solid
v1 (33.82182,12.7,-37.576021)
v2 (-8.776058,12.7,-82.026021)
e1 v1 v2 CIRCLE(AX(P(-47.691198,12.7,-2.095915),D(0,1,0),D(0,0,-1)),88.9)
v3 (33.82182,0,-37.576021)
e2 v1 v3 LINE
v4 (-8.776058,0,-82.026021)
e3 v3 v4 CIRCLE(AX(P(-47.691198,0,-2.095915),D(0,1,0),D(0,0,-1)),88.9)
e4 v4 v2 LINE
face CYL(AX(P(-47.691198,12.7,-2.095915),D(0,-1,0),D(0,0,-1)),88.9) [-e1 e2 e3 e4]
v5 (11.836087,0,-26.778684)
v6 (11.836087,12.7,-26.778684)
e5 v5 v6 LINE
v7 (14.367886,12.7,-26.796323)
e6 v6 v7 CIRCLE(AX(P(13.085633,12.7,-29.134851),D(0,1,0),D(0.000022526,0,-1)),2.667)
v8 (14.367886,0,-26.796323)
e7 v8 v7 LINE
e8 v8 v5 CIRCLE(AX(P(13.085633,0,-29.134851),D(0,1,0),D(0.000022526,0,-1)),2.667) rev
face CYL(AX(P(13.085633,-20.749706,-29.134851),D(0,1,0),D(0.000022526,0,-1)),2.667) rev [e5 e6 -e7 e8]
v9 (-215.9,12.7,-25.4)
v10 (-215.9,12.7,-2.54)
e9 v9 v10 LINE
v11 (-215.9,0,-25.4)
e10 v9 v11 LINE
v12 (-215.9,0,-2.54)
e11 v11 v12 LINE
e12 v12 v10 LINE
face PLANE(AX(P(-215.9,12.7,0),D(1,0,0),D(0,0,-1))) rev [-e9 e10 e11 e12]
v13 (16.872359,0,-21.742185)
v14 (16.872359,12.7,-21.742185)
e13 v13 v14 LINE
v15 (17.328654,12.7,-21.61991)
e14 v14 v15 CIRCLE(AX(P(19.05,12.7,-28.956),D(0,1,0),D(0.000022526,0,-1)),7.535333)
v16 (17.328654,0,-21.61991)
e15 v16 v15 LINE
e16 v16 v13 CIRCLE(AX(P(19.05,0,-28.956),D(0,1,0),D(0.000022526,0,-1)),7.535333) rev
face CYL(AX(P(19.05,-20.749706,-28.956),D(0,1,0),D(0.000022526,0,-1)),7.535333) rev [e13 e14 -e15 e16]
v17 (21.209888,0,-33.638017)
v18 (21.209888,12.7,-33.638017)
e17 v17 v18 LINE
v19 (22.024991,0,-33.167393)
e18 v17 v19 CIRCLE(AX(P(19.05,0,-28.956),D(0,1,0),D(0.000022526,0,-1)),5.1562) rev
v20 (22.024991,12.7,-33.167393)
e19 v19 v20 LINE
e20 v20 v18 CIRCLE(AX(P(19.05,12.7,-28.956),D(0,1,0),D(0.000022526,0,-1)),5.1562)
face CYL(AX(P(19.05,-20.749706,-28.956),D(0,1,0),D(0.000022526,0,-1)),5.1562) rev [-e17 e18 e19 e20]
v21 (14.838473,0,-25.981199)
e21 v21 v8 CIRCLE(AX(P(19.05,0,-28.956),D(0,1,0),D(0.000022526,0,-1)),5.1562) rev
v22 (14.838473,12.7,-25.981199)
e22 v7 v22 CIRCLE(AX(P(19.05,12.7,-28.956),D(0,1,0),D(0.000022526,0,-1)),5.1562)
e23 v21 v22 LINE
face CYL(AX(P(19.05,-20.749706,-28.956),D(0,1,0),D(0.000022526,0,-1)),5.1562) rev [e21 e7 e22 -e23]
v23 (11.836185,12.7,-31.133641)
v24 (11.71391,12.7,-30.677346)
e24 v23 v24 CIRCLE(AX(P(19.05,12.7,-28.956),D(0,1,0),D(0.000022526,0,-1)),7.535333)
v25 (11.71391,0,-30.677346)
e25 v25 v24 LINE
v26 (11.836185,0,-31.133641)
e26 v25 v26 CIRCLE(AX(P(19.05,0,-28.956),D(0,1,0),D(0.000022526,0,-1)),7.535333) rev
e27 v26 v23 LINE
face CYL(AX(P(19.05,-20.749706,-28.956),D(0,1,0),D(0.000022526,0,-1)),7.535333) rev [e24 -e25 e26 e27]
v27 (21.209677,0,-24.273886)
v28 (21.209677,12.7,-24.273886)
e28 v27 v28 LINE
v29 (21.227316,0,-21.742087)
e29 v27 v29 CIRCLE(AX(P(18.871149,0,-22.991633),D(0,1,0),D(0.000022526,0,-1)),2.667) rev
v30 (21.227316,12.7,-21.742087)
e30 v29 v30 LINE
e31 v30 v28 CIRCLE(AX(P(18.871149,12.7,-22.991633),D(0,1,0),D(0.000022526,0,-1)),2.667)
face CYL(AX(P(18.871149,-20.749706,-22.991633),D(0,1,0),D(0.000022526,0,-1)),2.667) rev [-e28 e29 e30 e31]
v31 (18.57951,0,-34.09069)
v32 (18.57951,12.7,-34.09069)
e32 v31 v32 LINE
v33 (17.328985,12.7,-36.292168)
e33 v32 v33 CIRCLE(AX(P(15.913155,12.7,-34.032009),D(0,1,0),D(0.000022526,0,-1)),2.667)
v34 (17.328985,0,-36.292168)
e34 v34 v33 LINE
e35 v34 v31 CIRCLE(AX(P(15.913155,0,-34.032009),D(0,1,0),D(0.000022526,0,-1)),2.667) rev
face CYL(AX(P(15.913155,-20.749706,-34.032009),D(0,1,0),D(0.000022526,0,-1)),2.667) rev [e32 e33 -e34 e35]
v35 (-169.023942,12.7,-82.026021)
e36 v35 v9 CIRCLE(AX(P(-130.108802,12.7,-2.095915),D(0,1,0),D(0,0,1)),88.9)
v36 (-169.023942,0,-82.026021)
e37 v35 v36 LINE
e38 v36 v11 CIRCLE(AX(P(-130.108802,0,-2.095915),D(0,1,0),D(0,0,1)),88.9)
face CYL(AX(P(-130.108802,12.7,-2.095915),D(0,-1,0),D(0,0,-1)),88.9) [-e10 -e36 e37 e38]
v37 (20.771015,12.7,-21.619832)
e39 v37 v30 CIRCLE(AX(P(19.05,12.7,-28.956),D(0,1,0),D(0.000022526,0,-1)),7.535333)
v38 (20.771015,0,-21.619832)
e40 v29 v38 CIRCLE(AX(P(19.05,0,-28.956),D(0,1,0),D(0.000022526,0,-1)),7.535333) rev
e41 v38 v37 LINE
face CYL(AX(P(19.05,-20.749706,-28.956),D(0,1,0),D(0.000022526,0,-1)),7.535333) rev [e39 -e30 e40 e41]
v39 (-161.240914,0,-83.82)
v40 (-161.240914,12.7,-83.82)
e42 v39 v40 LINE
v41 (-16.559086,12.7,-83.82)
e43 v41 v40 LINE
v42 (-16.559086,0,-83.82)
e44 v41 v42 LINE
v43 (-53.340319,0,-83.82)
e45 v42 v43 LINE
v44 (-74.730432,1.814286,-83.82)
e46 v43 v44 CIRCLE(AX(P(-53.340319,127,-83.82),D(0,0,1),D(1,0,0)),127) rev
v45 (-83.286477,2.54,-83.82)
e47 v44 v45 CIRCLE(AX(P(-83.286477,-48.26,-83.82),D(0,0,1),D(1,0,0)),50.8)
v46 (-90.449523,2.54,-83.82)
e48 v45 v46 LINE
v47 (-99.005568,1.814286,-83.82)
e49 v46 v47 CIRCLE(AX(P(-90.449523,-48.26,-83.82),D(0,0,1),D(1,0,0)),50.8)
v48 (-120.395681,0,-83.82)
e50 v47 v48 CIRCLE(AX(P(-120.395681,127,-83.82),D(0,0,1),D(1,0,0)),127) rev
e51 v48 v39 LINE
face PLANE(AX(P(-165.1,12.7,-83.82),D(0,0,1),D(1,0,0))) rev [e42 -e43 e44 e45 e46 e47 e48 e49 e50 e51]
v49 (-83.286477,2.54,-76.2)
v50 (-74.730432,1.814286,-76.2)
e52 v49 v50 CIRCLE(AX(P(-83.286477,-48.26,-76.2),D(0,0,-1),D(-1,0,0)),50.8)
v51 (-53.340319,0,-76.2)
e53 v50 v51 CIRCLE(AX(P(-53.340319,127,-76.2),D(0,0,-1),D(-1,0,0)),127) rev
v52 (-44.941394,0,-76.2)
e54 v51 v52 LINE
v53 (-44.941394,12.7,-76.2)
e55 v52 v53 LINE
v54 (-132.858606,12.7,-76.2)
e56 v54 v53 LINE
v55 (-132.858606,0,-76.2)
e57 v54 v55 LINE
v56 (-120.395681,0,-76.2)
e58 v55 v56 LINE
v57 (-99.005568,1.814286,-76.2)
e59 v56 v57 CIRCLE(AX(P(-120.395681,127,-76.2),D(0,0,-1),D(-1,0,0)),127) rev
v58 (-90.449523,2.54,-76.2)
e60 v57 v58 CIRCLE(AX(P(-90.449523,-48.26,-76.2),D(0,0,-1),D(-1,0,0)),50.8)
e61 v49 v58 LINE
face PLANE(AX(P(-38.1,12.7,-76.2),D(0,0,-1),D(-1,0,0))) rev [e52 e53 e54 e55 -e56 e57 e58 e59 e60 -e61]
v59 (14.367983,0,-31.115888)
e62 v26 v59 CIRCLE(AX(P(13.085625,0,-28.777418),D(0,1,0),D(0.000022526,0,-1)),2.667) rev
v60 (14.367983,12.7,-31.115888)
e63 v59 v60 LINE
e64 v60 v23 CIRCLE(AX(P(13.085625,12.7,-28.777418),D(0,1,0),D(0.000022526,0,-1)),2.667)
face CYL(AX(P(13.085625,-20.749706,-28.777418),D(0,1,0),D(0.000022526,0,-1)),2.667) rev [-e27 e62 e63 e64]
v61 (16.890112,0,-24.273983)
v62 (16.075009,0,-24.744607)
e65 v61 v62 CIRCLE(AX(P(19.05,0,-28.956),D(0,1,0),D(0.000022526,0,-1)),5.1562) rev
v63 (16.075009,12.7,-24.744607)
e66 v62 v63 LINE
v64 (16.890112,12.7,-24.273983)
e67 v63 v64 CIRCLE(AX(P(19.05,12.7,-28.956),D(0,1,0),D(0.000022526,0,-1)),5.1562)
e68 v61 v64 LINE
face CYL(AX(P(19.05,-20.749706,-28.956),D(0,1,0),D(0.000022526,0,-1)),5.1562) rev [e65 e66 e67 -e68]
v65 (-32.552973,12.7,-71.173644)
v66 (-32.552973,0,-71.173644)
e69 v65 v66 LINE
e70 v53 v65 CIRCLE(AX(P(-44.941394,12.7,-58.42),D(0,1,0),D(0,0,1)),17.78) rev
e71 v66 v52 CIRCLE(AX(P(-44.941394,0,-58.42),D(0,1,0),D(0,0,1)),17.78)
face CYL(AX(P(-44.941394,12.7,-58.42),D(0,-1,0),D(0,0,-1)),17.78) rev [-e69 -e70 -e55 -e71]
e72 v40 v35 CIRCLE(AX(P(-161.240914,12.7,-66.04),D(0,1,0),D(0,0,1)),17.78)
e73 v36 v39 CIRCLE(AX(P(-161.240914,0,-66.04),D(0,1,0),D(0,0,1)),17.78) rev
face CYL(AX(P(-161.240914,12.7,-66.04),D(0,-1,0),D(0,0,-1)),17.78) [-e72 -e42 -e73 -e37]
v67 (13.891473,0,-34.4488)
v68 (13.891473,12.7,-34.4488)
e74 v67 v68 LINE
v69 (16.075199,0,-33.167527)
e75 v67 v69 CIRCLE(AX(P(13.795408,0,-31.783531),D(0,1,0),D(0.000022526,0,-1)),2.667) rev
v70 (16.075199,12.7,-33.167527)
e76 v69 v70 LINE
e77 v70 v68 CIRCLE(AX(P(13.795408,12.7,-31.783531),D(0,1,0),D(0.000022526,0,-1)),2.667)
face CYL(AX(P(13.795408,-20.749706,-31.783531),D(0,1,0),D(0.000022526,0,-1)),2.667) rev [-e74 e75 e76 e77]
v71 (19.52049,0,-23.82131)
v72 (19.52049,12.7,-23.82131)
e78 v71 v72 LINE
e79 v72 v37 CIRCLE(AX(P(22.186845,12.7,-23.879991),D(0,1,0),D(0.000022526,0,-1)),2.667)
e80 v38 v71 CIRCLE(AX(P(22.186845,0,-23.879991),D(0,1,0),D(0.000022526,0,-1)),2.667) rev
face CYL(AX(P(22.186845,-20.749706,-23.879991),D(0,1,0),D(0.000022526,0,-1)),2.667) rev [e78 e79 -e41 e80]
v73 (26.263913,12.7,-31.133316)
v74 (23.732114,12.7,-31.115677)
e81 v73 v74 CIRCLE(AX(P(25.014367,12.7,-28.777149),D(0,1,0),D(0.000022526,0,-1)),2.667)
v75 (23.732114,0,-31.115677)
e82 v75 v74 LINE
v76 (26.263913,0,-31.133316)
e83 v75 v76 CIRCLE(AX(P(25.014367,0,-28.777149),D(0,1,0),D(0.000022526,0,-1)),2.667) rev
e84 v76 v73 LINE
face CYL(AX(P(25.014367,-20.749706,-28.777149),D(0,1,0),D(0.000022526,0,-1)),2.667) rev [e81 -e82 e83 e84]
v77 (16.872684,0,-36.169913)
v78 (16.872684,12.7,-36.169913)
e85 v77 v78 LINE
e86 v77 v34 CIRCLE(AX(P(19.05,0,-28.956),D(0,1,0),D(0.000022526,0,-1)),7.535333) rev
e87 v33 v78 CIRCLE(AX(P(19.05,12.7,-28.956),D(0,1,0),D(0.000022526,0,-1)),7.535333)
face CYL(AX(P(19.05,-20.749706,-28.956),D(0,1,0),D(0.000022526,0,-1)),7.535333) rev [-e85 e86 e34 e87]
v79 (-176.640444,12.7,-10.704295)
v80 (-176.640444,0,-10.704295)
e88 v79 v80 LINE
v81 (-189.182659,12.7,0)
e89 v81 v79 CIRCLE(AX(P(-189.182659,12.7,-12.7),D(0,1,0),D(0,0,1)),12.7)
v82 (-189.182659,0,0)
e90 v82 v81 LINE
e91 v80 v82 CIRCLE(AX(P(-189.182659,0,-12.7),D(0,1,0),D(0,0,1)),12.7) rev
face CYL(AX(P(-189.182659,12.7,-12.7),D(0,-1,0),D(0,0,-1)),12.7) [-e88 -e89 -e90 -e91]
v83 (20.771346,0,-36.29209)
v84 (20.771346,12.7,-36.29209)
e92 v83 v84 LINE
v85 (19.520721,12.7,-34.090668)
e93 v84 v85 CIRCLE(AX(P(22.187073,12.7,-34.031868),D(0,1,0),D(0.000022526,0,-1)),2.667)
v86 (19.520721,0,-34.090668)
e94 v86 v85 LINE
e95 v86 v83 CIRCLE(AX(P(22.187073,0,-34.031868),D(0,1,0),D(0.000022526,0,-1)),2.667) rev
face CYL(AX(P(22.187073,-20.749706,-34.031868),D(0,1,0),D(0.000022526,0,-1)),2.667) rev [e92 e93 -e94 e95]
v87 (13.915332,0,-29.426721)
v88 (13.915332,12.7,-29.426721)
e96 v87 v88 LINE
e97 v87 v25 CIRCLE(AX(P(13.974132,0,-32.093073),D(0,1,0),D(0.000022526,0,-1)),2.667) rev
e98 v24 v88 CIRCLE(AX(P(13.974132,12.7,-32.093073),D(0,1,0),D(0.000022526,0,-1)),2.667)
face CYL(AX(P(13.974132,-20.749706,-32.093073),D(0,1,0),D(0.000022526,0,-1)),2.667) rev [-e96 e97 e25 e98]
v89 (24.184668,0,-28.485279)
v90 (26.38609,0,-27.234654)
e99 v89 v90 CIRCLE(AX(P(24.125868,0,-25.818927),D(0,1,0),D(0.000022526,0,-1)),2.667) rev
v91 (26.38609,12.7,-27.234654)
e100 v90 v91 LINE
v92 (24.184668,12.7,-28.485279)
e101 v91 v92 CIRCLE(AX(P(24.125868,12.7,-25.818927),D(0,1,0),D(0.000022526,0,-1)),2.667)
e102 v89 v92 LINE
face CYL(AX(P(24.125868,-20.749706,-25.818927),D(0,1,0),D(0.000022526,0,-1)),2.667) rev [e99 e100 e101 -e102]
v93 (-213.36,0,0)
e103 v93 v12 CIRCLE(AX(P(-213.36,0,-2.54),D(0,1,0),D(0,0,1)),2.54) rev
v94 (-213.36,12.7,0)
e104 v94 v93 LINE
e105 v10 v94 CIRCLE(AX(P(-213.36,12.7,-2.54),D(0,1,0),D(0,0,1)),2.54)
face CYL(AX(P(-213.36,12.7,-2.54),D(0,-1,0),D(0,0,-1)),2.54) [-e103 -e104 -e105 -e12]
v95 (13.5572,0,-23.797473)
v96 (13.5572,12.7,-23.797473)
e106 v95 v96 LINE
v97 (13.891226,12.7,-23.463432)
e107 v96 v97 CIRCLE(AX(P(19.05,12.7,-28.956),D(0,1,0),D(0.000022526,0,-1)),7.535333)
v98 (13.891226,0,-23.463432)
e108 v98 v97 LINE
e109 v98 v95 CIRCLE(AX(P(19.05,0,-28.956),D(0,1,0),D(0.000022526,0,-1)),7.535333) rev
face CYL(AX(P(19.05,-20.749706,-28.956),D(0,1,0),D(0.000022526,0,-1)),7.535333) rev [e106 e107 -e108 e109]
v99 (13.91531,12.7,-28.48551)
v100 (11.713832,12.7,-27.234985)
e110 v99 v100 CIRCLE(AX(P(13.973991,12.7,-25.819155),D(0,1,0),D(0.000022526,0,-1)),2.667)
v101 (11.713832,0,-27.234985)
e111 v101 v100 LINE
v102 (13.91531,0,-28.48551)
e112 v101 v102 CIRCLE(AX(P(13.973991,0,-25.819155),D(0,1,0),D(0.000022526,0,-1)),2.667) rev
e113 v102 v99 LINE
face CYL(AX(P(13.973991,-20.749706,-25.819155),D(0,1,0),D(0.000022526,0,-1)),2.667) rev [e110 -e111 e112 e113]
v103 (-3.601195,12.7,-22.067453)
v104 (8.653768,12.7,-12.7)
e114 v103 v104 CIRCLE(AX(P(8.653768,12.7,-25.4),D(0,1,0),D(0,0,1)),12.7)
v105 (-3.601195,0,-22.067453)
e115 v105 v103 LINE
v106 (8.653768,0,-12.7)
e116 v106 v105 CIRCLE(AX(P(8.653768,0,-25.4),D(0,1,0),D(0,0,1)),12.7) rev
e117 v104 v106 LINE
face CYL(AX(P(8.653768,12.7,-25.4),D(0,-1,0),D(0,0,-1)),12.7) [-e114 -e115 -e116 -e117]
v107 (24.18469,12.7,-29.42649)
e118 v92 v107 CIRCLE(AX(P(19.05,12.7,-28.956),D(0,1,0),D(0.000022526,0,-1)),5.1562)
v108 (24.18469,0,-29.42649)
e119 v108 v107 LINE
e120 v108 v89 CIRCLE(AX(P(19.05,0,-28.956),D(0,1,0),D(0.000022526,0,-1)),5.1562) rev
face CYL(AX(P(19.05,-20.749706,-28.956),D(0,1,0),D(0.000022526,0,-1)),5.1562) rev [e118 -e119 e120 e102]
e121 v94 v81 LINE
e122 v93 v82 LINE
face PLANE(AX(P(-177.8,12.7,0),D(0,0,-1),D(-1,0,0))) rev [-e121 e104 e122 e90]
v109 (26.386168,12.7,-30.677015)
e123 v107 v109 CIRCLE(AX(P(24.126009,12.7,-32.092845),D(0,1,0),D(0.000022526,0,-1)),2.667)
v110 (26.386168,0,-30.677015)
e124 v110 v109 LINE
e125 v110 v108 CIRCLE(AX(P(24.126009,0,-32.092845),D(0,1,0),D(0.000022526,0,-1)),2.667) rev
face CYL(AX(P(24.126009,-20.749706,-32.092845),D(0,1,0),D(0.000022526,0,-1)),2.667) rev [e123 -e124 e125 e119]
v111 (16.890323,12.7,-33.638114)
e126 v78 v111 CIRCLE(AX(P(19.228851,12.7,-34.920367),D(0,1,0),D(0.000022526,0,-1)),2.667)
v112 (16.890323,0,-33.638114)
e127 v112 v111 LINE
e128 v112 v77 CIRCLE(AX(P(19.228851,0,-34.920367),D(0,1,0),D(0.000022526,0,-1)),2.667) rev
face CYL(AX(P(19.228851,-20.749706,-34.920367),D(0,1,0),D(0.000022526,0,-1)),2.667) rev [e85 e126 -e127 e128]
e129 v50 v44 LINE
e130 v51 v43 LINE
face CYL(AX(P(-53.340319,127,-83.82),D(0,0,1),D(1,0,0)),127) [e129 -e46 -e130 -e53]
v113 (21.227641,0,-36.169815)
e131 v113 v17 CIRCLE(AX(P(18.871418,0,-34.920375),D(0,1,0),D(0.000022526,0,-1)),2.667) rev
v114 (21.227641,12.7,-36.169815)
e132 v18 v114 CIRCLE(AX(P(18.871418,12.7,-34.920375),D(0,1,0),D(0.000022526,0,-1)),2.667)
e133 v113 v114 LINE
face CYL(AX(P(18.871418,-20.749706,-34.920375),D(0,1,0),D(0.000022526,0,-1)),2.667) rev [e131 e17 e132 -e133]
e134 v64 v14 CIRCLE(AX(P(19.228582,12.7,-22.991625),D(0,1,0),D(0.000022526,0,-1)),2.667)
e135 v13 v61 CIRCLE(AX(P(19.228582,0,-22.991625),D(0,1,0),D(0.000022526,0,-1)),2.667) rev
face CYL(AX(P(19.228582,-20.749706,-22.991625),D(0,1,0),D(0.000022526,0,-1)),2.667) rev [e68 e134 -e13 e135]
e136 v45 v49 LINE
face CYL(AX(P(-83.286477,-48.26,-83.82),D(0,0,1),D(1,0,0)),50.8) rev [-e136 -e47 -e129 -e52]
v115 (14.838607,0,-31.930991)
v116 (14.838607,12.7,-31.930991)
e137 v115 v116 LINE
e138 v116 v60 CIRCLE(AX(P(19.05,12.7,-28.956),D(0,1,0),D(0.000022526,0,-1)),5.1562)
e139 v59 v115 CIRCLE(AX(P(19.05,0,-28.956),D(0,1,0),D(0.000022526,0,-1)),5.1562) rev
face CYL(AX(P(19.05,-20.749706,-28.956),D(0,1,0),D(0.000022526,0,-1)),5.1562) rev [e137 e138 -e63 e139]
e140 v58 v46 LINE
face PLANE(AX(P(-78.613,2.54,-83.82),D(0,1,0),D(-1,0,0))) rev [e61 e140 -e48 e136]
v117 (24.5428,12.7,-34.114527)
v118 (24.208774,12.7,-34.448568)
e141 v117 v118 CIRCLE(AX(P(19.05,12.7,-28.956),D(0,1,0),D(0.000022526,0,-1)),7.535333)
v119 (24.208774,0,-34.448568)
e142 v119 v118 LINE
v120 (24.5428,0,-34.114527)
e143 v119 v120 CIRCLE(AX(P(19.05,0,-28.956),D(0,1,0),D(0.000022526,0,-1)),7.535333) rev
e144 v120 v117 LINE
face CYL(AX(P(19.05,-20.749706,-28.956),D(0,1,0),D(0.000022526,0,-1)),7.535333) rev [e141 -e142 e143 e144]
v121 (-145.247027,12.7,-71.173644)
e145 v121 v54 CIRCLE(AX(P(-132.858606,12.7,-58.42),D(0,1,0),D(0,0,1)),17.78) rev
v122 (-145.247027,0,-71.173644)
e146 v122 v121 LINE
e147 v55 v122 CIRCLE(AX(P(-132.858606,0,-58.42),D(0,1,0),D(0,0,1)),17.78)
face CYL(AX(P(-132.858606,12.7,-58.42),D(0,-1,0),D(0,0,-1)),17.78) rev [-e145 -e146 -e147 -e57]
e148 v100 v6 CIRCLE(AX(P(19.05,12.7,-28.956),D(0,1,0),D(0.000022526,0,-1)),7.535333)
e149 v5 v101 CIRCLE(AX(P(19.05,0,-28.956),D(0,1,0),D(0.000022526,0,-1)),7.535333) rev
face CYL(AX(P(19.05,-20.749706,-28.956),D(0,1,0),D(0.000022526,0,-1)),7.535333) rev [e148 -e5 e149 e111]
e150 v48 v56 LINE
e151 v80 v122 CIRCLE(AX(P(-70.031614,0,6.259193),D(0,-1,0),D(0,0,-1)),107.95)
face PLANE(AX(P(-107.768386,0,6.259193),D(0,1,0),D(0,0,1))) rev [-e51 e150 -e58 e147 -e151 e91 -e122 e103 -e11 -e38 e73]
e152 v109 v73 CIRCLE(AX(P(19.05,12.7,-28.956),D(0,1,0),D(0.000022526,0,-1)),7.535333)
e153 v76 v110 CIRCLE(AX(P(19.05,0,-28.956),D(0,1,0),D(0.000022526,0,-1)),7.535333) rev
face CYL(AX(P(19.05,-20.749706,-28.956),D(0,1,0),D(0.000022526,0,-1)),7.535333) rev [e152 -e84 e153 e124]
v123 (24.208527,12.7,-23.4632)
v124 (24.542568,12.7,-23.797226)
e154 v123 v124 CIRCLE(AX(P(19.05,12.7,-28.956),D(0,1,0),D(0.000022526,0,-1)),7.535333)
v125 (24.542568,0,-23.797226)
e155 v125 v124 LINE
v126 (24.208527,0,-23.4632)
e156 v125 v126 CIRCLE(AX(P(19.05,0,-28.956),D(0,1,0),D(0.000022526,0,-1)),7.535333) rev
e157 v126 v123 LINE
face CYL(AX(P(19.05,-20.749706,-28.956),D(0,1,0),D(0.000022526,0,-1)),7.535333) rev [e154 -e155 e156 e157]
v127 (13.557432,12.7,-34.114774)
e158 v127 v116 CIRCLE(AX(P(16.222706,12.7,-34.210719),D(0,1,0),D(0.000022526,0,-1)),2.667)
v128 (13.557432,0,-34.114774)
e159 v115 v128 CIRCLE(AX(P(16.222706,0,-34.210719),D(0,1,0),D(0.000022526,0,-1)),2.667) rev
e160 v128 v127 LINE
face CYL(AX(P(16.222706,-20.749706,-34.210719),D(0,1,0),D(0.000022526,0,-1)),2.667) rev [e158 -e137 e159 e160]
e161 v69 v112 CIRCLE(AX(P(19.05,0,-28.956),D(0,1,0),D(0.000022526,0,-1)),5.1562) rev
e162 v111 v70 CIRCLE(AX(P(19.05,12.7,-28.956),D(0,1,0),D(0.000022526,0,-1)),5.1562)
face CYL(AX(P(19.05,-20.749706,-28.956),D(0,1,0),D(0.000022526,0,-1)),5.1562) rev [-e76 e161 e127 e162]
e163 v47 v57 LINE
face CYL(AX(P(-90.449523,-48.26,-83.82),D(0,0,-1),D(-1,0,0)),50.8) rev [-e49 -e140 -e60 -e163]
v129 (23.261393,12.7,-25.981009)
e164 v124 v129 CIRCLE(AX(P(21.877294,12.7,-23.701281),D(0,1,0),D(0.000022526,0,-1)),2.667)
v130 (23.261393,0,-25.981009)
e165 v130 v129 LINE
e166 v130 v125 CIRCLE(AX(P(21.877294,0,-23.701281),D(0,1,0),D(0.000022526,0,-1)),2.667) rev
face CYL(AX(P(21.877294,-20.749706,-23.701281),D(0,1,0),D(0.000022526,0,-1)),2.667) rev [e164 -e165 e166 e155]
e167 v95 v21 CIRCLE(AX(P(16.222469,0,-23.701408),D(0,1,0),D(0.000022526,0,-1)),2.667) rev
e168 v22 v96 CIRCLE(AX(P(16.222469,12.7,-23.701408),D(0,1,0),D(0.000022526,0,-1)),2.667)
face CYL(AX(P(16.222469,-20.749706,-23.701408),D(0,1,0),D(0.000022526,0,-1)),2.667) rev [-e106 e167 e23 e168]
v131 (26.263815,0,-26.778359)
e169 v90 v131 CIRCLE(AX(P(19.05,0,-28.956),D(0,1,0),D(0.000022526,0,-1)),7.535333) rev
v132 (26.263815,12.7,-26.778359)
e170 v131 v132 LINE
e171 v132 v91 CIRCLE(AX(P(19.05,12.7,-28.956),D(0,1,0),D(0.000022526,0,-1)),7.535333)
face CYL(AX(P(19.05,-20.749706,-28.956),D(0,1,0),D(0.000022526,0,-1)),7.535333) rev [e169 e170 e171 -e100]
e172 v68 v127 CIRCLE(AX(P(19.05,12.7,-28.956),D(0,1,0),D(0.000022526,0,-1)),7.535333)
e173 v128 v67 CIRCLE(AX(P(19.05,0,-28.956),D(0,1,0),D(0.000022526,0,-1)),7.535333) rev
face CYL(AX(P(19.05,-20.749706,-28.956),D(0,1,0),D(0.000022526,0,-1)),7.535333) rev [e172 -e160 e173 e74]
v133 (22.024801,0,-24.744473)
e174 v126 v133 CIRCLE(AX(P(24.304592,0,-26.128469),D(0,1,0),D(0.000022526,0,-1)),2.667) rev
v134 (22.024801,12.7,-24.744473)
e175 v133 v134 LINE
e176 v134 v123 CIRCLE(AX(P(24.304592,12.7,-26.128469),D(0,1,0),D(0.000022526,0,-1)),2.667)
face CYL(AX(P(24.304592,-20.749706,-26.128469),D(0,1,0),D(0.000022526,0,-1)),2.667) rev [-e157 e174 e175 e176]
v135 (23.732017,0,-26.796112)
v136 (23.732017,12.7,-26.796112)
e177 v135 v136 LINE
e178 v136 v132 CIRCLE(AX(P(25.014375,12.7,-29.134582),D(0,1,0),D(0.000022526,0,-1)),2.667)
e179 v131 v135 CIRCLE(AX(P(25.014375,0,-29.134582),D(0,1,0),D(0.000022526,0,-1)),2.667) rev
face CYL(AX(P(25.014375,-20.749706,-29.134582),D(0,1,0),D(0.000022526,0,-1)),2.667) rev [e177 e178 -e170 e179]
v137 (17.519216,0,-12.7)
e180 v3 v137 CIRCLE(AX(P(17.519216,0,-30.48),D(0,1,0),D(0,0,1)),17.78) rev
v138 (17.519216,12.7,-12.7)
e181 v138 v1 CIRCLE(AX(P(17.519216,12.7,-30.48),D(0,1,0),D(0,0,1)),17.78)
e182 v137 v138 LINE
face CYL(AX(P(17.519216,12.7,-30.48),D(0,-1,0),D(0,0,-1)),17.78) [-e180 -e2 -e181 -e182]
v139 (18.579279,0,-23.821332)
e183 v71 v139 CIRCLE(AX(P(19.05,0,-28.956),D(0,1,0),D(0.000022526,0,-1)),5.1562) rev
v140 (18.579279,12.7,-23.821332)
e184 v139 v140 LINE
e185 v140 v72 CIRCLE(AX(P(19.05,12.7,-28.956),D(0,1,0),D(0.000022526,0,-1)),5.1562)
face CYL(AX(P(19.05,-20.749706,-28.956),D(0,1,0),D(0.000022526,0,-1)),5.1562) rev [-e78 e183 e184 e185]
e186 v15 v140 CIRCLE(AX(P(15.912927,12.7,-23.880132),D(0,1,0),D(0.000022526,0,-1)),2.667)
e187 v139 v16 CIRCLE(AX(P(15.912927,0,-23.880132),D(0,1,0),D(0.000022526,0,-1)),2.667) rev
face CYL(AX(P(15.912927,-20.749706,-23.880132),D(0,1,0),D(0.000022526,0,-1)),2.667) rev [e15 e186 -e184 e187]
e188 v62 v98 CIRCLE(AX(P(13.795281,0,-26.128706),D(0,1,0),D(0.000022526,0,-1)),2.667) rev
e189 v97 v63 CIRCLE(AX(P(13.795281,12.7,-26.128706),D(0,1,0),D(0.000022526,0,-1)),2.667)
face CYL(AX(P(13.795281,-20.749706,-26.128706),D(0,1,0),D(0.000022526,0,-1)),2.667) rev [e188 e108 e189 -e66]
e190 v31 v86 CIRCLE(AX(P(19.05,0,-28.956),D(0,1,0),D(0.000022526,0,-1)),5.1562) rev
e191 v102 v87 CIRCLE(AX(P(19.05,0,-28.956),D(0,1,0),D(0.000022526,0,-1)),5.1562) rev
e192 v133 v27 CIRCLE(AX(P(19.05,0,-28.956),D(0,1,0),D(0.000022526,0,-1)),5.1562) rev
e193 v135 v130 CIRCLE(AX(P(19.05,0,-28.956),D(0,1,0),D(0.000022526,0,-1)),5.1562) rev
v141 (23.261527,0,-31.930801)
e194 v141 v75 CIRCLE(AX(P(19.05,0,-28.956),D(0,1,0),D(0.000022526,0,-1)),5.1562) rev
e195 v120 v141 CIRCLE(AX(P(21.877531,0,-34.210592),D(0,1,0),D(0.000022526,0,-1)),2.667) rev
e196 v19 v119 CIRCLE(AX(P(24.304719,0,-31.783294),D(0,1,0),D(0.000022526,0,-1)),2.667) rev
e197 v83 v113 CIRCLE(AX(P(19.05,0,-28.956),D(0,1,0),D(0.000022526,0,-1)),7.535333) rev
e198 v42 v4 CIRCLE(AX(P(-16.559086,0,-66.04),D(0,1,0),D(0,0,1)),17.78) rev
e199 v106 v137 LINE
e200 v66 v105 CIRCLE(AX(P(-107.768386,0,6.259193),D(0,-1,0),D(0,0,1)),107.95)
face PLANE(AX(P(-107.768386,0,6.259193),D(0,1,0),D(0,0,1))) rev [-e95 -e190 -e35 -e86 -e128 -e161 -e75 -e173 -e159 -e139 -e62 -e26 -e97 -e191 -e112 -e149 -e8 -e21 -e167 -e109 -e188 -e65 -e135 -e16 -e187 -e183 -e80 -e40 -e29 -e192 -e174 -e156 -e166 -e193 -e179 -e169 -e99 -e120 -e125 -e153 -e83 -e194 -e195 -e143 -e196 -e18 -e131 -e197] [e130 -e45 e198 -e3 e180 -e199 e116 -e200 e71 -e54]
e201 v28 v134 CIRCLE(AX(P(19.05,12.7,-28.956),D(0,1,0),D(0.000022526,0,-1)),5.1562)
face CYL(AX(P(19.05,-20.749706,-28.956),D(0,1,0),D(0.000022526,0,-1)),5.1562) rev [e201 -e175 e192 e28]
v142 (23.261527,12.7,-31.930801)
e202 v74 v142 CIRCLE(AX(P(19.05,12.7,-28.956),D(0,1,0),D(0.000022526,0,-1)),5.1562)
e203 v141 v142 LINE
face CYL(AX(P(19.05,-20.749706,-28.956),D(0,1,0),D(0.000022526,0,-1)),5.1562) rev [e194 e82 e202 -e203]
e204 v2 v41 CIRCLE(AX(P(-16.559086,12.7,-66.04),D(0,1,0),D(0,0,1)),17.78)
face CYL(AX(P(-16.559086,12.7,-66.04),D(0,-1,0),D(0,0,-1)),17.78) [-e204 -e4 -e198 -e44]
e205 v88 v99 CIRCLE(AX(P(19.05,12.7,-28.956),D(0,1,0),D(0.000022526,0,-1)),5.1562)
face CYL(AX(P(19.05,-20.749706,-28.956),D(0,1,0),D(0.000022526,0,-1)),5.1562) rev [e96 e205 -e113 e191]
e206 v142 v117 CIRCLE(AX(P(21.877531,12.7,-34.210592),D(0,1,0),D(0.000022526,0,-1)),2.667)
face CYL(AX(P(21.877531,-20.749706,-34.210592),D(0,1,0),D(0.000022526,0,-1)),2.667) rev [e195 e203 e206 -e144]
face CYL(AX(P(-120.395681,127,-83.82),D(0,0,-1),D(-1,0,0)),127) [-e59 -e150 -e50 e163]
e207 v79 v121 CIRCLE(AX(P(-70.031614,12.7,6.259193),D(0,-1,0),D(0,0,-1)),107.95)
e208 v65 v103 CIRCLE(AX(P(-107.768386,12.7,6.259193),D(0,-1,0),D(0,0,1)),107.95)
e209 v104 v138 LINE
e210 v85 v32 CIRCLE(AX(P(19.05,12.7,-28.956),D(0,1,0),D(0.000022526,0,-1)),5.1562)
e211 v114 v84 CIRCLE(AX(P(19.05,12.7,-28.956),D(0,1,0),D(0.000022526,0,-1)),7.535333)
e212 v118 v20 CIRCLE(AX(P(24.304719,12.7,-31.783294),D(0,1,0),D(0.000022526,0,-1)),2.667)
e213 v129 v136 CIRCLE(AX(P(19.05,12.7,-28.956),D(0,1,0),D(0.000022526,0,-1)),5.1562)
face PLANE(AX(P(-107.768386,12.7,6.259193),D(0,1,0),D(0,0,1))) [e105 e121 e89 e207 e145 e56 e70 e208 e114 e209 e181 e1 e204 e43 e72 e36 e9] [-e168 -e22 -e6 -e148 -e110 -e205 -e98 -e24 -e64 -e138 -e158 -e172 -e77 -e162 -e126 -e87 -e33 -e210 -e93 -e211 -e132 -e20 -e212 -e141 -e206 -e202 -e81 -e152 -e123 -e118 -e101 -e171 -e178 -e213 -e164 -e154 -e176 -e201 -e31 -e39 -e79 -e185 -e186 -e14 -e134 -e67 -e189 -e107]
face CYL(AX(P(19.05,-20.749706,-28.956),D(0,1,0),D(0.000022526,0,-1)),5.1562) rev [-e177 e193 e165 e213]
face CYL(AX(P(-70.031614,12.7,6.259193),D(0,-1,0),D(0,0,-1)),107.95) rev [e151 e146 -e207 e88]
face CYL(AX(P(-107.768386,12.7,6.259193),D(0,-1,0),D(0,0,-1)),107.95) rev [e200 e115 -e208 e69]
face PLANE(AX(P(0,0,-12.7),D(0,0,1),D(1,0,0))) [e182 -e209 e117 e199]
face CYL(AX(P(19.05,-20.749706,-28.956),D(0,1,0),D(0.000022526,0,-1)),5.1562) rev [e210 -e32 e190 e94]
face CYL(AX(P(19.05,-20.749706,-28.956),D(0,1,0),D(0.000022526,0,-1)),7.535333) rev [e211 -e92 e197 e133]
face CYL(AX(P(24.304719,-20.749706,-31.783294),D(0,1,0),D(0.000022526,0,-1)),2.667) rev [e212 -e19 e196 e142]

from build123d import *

# Parameters (mm, degrees)
BOSS_EXTRUDE1_DEPTH = 12.7
SKETCH3_R           = 2.286
CUT_EXTRUDE1_DEPTH  = 232.948038146
CAVITY1_START       = -1
CAVITY1_OUTLINE_R   = 2.286
CAVITY1_DEPTH       = 15
CUT_EXTRUDE2_DEPTH  = 232.948038146
FILLET1_R           = 12.7
FILLET2_R           = 2.54
FILLET3_R           = 20.32
FILLET4_R           = 17.78
SKETCH5_W           = 16.51
SKETCH5_H           = 5.08
CUT_EXTRUDE3_DEPTH  = 230.304470216
FILLET5_R           = 127
FILLET6_R           = 50.8


with BuildPart() as part:
    # Sketch1 → Boss-Extrude1 (new body)
    with BuildSketch(Plane(origin=(0, 0, 0), x_dir=(1, 0, 0), z_dir=(0, 1, 0))):
        with BuildLine():
            Line((0, 0), (38.1, 0))
            Line((38.1, 0), (38.1, 25.4))
            ThreePointArc((38.1, 25.4), (19.393233119, 60.430202712), (-12.7, 83.82))
            Line((-12.7, 83.82), (-165.1, 83.82))
            ThreePointArc((-165.1, 83.82), (-197.193233119, 60.430202712), (-215.9, 25.4))
            Line((-215.9, 25.4), (-215.9, 0))
            Line((-215.9, 0), (-177.8, 0))
            ThreePointArc((-177.8, 0), (-166.58502935, 42.017514675), (-139.7, 76.2))
            Line((-139.7, 76.2), (-38.1, 76.2))
            ThreePointArc((-38.1, 76.2), (-11.21497065, 42.017514675), (0, 0))
        make_face()
    extrude(amount=BOSS_EXTRUDE1_DEPTH)

    # Sketch3 → Cut-Extrude1 (cut, through all)
    with BuildSketch(Plane(origin=(0, 12.7, 0), x_dir=(1, 0, 0), z_dir=(0, 1, 0))):
        with Locations(Location((19.05, 28.956, 0), (0, 0, 270))):
            Circle(SKETCH3_R)
    extrude(amount=-CUT_EXTRUDE1_DEPTH, mode=Mode.SUBTRACT)

    # Cavity1: read off the stored shape, not the designer's step
    # Cavity1 outline → Cavity1 (cut)
    with BuildSketch(Plane(origin=(0, 0, 0), x_dir=(1, 0, 0), z_dir=(0, 1, 0)).offset(CAVITY1_START)):
        with BuildLine():
            ThreePointArc((13.557199982, 23.797473427), (13.721594677, 23.627834729), (13.891225968, 23.463432392))
            ThreePointArc((13.891225968, 23.463432392), (15.144839416, 23.828362371), (16.075009031, 24.744607454))
            ThreePointArc((16.075009031, 24.744607454), (16.471799412, 24.490657889), (16.890111616, 24.273983275))
            ThreePointArc((16.890111616, 24.273983275), (16.561647975, 23.010325013), (16.872358933, 21.742184932))
            ThreePointArc((16.872358933, 21.742184932), (17.099548264, 21.677470858), (17.32865444, 21.619909903))
            ThreePointArc((17.32865444, 21.619909903), (18.231850543, 22.56275526), (18.579278518, 23.821331586))
            ThreePointArc((18.579278518, 23.821331586), (19.049883851, 23.799800001), (19.520490153, 23.821310384))
            ThreePointArc((19.520490153, 23.821310384), (19.867861426, 22.562718407), (20.77101505, 21.61983236))
            ThreePointArc((20.77101505, 21.61983236), (21.000123819, 21.677382993), (21.227316065, 21.742086832))
            ThreePointArc((21.227316065, 21.742086832), (21.538084156, 23.010212914), (21.209677446, 24.273885972))
            ThreePointArc((21.209677446, 24.273885972), (21.627999411, 24.490541739), (22.024801233, 24.744473428))
            ThreePointArc((22.024801233, 24.744473428), (22.954929568, 23.828186439), (24.208526573, 23.463199982))
            ThreePointArc((24.208526573, 23.463199982), (24.378165271, 23.627594677), (24.542567608, 23.797225968))
            ThreePointArc((24.542567608, 23.797225968), (24.177637629, 25.050839416), (23.261392546, 25.981009031))
            ThreePointArc((23.261392546, 25.981009031), (23.515342111, 26.377799412), (23.732016725, 26.796111616))
            ThreePointArc((23.732016725, 26.796111616), (24.995674987, 26.467647975), (26.263815068, 26.778358933))
            ThreePointArc((26.263815068, 26.778358933), (26.328529142, 27.005548264), (26.386090097, 27.23465444))
            ThreePointArc((26.386090097, 27.23465444), (25.44324474, 28.137850543), (24.184668414, 28.485278518))
            ThreePointArc((24.184668414, 28.485278518), (24.206199999, 28.955883851), (24.184689616, 29.426490153))
            ThreePointArc((24.184689616, 29.426490153), (25.443281593, 29.773861426), (26.38616764, 30.67701505))
            ThreePointArc((26.38616764, 30.67701505), (26.328617007, 30.906123819), (26.263913168, 31.133316065))
            ThreePointArc((26.263913168, 31.133316065), (24.995787086, 31.444084156), (23.732114028, 31.115677446))
            ThreePointArc((23.732114028, 31.115677446), (23.515458261, 31.533999411), (23.261526572, 31.930801233))
            ThreePointArc((23.261526572, 31.930801233), (24.177813561, 32.860929568), (24.542800018, 34.114526573))
            ThreePointArc((24.542800018, 34.114526573), (24.378405323, 34.284165271), (24.208774032, 34.448567608))
            ThreePointArc((24.208774032, 34.448567608), (22.955160584, 34.083637629), (22.024990969, 33.167392546))
            ThreePointArc((22.024990969, 33.167392546), (21.628200588, 33.421342111), (21.209888384, 33.638016725))
            ThreePointArc((21.209888384, 33.638016725), (21.538352025, 34.901674987), (21.227641067, 36.169815068))
            ThreePointArc((21.227641067, 36.169815068), (21.000451736, 36.234529142), (20.77134556, 36.292090097))
            ThreePointArc((20.77134556, 36.292090097), (19.868149457, 35.34924474), (19.520721482, 34.090668414))
            ThreePointArc((19.520721482, 34.090668414), (19.050116149, 34.112199999), (18.579509847, 34.090689616))
            ThreePointArc((18.579509847, 34.090689616), (18.232138574, 35.349281593), (17.32898495, 36.29216764))
            ThreePointArc((17.32898495, 36.29216764), (17.099876181, 36.234617007), (16.872683935, 36.169913168))
            ThreePointArc((16.872683935, 36.169913168), (16.561915844, 34.901787086), (16.890322554, 33.638114028))
            ThreePointArc((16.890322554, 33.638114028), (16.472000589, 33.421458261), (16.075198767, 33.167526572))
            ThreePointArc((16.075198767, 33.167526572), (15.145070432, 34.083813561), (13.891473427, 34.448800018))
            ThreePointArc((13.891473427, 34.448800018), (13.721834729, 34.284405323), (13.557432392, 34.114774032))
            ThreePointArc((13.557432392, 34.114774032), (13.922362371, 32.861160584), (14.838607454, 31.930990969))
            ThreePointArc((14.838607454, 31.930990969), (14.584657889, 31.534200588), (14.367983275, 31.115888384))
            ThreePointArc((14.367983275, 31.115888384), (13.104325013, 31.444352025), (11.836184932, 31.133641067))
            ThreePointArc((11.836184932, 31.133641067), (11.771470858, 30.906451736), (11.713909903, 30.67734556))
            ThreePointArc((11.713909903, 30.67734556), (12.65675526, 29.774149457), (13.915331586, 29.426721482))
            ThreePointArc((13.915331586, 29.426721482), (13.893800001, 28.956116149), (13.915310384, 28.485509847))
            ThreePointArc((13.915310384, 28.485509847), (12.656718407, 28.138138574), (11.71383236, 27.23498495))
            ThreePointArc((11.71383236, 27.23498495), (11.771382993, 27.005876181), (11.836086832, 26.778683935))
            ThreePointArc((11.836086832, 26.778683935), (13.104212914, 26.467915844), (14.367885972, 26.796322554))
            ThreePointArc((14.367885972, 26.796322554), (14.584541739, 26.378000589), (14.838473428, 25.981198767))
            ThreePointArc((14.838473428, 25.981198767), (13.922186439, 25.051070432), (13.557199982, 23.797473427))
        make_face()
        with Locations((19.05, 28.956)):
            Circle(CAVITY1_OUTLINE_R, mode=Mode.SUBTRACT)
    extrude(amount=CAVITY1_DEPTH, mode=Mode.SUBTRACT)

    # Sketch4 → Cut-Extrude2 (cut, through all)
    with BuildSketch(Plane(origin=(0, 12.7, 0), x_dir=(1, 0, 0), z_dir=(0, 1, 0))):
        with BuildLine():
            Line((38.1, 12.7), (-1.496322316, 12.7))
            ThreePointArc((-1.496322316, 12.7), (-0.559939387, 6.372176412), (0, 0))
            Line((0, 0), (38.1, 0))
            Line((38.1, 0), (38.1, 12.7))
        make_face()
    extrude(amount=-CUT_EXTRUDE2_DEPTH, mode=Mode.SUBTRACT)

    # Fillet1
    fillet1_edges = [part.edges().sort_by_distance(p)[0] for p in [
        (-1.496322316, 6.35, -12.7),
        (-177.8, 6.35, 0),
    ]]
    fillet(fillet1_edges, radius=FILLET1_R)

    # Fillet2
    fillet2_edges = [part.edges().sort_by_distance(p)[0] for p in [
        (-215.9, 6.35, 0),
    ]]
    fillet(fillet2_edges, radius=FILLET2_R)

    # Fillet3
    # the kernel refuses this fillet: 20.32 mm, written as the material it takes off along each edge
    with BuildSketch(Plane(origin=(38.1, 59.792860393, -12.7), x_dir=(0, 0, -1), z_dir=(0, -1, 0))) as fillet3_piece_1:
        with BuildLine():
            CenterArc((20.32, -18.837144157), FILLET3_R, 112.024312837, 67.975687163)
            Line((0, -18.837144157), (-0.4064, -18.837144157))
            Line((-0.4064, -18.837144157), (-0.4064, 0))
            Line((-0.4064, 0), (0, 0.4064))
            ThreePointArc((0, 0.4064), (6.35, 0.4064), (12.5476, 0.376742883))
            Line((12.5476, 0.376742883), (12.7, 0))
        make_face()
    extrude(amount=106.885720786, mode=Mode.SUBTRACT)

    # Fillet4
    fillet4_edges = [part.edges().sort_by_distance(p)[0] for p in [
        (38.1, 6.35, -25.4),
        (-139.7, 6.35, -76.2),
        (-38.1, 6.35, -76.2),
        (-12.7, 6.35, -83.82),
        (-165.1, 6.35, -83.82),
    ]]
    fillet(fillet4_edges, radius=FILLET4_R)

    # Sketch5 → Cut-Extrude3 (cut, through all)
    with BuildSketch(Plane.XY.offset(-76.2)):
        with Locations((-86.868, 0)):
            Rectangle(SKETCH5_W, SKETCH5_H)
    extrude(amount=-CUT_EXTRUDE3_DEPTH, mode=Mode.SUBTRACT)

    # Fillet5
    # the kernel refuses this fillet: 127 mm, written as the material it takes off along each edge
    with BuildSketch(Plane(origin=(-95.123, 0, -13.018297744), x_dir=(-1, 0, 0), z_dir=(0, 0, -1)), Plane(origin=(-78.613, 0, -147.001702256), x_dir=(1, 0, 0), z_dir=(0, 0, 1))) as fillet5_piece_1:
        with BuildLine():
            CenterArc((25.272680903, 127), FILLET5_R, 258.521659045, 11.478340955)
            Line((0, 2.54), (0, 0))
            Line((0, 0), (25.272680903, 0))
        make_face()
    extrude(amount=133.983404513, mode=Mode.SUBTRACT)

    # Fillet6
    fillet6_edges = [part.edges().sort_by_distance(p)[0] for p in [
        (-78.613, 2.54, -80.01),
        (-95.123, 2.54, -80.01),
    ]]
    fillet(fillet6_edges, radius=FILLET6_R)


solid = part.part
